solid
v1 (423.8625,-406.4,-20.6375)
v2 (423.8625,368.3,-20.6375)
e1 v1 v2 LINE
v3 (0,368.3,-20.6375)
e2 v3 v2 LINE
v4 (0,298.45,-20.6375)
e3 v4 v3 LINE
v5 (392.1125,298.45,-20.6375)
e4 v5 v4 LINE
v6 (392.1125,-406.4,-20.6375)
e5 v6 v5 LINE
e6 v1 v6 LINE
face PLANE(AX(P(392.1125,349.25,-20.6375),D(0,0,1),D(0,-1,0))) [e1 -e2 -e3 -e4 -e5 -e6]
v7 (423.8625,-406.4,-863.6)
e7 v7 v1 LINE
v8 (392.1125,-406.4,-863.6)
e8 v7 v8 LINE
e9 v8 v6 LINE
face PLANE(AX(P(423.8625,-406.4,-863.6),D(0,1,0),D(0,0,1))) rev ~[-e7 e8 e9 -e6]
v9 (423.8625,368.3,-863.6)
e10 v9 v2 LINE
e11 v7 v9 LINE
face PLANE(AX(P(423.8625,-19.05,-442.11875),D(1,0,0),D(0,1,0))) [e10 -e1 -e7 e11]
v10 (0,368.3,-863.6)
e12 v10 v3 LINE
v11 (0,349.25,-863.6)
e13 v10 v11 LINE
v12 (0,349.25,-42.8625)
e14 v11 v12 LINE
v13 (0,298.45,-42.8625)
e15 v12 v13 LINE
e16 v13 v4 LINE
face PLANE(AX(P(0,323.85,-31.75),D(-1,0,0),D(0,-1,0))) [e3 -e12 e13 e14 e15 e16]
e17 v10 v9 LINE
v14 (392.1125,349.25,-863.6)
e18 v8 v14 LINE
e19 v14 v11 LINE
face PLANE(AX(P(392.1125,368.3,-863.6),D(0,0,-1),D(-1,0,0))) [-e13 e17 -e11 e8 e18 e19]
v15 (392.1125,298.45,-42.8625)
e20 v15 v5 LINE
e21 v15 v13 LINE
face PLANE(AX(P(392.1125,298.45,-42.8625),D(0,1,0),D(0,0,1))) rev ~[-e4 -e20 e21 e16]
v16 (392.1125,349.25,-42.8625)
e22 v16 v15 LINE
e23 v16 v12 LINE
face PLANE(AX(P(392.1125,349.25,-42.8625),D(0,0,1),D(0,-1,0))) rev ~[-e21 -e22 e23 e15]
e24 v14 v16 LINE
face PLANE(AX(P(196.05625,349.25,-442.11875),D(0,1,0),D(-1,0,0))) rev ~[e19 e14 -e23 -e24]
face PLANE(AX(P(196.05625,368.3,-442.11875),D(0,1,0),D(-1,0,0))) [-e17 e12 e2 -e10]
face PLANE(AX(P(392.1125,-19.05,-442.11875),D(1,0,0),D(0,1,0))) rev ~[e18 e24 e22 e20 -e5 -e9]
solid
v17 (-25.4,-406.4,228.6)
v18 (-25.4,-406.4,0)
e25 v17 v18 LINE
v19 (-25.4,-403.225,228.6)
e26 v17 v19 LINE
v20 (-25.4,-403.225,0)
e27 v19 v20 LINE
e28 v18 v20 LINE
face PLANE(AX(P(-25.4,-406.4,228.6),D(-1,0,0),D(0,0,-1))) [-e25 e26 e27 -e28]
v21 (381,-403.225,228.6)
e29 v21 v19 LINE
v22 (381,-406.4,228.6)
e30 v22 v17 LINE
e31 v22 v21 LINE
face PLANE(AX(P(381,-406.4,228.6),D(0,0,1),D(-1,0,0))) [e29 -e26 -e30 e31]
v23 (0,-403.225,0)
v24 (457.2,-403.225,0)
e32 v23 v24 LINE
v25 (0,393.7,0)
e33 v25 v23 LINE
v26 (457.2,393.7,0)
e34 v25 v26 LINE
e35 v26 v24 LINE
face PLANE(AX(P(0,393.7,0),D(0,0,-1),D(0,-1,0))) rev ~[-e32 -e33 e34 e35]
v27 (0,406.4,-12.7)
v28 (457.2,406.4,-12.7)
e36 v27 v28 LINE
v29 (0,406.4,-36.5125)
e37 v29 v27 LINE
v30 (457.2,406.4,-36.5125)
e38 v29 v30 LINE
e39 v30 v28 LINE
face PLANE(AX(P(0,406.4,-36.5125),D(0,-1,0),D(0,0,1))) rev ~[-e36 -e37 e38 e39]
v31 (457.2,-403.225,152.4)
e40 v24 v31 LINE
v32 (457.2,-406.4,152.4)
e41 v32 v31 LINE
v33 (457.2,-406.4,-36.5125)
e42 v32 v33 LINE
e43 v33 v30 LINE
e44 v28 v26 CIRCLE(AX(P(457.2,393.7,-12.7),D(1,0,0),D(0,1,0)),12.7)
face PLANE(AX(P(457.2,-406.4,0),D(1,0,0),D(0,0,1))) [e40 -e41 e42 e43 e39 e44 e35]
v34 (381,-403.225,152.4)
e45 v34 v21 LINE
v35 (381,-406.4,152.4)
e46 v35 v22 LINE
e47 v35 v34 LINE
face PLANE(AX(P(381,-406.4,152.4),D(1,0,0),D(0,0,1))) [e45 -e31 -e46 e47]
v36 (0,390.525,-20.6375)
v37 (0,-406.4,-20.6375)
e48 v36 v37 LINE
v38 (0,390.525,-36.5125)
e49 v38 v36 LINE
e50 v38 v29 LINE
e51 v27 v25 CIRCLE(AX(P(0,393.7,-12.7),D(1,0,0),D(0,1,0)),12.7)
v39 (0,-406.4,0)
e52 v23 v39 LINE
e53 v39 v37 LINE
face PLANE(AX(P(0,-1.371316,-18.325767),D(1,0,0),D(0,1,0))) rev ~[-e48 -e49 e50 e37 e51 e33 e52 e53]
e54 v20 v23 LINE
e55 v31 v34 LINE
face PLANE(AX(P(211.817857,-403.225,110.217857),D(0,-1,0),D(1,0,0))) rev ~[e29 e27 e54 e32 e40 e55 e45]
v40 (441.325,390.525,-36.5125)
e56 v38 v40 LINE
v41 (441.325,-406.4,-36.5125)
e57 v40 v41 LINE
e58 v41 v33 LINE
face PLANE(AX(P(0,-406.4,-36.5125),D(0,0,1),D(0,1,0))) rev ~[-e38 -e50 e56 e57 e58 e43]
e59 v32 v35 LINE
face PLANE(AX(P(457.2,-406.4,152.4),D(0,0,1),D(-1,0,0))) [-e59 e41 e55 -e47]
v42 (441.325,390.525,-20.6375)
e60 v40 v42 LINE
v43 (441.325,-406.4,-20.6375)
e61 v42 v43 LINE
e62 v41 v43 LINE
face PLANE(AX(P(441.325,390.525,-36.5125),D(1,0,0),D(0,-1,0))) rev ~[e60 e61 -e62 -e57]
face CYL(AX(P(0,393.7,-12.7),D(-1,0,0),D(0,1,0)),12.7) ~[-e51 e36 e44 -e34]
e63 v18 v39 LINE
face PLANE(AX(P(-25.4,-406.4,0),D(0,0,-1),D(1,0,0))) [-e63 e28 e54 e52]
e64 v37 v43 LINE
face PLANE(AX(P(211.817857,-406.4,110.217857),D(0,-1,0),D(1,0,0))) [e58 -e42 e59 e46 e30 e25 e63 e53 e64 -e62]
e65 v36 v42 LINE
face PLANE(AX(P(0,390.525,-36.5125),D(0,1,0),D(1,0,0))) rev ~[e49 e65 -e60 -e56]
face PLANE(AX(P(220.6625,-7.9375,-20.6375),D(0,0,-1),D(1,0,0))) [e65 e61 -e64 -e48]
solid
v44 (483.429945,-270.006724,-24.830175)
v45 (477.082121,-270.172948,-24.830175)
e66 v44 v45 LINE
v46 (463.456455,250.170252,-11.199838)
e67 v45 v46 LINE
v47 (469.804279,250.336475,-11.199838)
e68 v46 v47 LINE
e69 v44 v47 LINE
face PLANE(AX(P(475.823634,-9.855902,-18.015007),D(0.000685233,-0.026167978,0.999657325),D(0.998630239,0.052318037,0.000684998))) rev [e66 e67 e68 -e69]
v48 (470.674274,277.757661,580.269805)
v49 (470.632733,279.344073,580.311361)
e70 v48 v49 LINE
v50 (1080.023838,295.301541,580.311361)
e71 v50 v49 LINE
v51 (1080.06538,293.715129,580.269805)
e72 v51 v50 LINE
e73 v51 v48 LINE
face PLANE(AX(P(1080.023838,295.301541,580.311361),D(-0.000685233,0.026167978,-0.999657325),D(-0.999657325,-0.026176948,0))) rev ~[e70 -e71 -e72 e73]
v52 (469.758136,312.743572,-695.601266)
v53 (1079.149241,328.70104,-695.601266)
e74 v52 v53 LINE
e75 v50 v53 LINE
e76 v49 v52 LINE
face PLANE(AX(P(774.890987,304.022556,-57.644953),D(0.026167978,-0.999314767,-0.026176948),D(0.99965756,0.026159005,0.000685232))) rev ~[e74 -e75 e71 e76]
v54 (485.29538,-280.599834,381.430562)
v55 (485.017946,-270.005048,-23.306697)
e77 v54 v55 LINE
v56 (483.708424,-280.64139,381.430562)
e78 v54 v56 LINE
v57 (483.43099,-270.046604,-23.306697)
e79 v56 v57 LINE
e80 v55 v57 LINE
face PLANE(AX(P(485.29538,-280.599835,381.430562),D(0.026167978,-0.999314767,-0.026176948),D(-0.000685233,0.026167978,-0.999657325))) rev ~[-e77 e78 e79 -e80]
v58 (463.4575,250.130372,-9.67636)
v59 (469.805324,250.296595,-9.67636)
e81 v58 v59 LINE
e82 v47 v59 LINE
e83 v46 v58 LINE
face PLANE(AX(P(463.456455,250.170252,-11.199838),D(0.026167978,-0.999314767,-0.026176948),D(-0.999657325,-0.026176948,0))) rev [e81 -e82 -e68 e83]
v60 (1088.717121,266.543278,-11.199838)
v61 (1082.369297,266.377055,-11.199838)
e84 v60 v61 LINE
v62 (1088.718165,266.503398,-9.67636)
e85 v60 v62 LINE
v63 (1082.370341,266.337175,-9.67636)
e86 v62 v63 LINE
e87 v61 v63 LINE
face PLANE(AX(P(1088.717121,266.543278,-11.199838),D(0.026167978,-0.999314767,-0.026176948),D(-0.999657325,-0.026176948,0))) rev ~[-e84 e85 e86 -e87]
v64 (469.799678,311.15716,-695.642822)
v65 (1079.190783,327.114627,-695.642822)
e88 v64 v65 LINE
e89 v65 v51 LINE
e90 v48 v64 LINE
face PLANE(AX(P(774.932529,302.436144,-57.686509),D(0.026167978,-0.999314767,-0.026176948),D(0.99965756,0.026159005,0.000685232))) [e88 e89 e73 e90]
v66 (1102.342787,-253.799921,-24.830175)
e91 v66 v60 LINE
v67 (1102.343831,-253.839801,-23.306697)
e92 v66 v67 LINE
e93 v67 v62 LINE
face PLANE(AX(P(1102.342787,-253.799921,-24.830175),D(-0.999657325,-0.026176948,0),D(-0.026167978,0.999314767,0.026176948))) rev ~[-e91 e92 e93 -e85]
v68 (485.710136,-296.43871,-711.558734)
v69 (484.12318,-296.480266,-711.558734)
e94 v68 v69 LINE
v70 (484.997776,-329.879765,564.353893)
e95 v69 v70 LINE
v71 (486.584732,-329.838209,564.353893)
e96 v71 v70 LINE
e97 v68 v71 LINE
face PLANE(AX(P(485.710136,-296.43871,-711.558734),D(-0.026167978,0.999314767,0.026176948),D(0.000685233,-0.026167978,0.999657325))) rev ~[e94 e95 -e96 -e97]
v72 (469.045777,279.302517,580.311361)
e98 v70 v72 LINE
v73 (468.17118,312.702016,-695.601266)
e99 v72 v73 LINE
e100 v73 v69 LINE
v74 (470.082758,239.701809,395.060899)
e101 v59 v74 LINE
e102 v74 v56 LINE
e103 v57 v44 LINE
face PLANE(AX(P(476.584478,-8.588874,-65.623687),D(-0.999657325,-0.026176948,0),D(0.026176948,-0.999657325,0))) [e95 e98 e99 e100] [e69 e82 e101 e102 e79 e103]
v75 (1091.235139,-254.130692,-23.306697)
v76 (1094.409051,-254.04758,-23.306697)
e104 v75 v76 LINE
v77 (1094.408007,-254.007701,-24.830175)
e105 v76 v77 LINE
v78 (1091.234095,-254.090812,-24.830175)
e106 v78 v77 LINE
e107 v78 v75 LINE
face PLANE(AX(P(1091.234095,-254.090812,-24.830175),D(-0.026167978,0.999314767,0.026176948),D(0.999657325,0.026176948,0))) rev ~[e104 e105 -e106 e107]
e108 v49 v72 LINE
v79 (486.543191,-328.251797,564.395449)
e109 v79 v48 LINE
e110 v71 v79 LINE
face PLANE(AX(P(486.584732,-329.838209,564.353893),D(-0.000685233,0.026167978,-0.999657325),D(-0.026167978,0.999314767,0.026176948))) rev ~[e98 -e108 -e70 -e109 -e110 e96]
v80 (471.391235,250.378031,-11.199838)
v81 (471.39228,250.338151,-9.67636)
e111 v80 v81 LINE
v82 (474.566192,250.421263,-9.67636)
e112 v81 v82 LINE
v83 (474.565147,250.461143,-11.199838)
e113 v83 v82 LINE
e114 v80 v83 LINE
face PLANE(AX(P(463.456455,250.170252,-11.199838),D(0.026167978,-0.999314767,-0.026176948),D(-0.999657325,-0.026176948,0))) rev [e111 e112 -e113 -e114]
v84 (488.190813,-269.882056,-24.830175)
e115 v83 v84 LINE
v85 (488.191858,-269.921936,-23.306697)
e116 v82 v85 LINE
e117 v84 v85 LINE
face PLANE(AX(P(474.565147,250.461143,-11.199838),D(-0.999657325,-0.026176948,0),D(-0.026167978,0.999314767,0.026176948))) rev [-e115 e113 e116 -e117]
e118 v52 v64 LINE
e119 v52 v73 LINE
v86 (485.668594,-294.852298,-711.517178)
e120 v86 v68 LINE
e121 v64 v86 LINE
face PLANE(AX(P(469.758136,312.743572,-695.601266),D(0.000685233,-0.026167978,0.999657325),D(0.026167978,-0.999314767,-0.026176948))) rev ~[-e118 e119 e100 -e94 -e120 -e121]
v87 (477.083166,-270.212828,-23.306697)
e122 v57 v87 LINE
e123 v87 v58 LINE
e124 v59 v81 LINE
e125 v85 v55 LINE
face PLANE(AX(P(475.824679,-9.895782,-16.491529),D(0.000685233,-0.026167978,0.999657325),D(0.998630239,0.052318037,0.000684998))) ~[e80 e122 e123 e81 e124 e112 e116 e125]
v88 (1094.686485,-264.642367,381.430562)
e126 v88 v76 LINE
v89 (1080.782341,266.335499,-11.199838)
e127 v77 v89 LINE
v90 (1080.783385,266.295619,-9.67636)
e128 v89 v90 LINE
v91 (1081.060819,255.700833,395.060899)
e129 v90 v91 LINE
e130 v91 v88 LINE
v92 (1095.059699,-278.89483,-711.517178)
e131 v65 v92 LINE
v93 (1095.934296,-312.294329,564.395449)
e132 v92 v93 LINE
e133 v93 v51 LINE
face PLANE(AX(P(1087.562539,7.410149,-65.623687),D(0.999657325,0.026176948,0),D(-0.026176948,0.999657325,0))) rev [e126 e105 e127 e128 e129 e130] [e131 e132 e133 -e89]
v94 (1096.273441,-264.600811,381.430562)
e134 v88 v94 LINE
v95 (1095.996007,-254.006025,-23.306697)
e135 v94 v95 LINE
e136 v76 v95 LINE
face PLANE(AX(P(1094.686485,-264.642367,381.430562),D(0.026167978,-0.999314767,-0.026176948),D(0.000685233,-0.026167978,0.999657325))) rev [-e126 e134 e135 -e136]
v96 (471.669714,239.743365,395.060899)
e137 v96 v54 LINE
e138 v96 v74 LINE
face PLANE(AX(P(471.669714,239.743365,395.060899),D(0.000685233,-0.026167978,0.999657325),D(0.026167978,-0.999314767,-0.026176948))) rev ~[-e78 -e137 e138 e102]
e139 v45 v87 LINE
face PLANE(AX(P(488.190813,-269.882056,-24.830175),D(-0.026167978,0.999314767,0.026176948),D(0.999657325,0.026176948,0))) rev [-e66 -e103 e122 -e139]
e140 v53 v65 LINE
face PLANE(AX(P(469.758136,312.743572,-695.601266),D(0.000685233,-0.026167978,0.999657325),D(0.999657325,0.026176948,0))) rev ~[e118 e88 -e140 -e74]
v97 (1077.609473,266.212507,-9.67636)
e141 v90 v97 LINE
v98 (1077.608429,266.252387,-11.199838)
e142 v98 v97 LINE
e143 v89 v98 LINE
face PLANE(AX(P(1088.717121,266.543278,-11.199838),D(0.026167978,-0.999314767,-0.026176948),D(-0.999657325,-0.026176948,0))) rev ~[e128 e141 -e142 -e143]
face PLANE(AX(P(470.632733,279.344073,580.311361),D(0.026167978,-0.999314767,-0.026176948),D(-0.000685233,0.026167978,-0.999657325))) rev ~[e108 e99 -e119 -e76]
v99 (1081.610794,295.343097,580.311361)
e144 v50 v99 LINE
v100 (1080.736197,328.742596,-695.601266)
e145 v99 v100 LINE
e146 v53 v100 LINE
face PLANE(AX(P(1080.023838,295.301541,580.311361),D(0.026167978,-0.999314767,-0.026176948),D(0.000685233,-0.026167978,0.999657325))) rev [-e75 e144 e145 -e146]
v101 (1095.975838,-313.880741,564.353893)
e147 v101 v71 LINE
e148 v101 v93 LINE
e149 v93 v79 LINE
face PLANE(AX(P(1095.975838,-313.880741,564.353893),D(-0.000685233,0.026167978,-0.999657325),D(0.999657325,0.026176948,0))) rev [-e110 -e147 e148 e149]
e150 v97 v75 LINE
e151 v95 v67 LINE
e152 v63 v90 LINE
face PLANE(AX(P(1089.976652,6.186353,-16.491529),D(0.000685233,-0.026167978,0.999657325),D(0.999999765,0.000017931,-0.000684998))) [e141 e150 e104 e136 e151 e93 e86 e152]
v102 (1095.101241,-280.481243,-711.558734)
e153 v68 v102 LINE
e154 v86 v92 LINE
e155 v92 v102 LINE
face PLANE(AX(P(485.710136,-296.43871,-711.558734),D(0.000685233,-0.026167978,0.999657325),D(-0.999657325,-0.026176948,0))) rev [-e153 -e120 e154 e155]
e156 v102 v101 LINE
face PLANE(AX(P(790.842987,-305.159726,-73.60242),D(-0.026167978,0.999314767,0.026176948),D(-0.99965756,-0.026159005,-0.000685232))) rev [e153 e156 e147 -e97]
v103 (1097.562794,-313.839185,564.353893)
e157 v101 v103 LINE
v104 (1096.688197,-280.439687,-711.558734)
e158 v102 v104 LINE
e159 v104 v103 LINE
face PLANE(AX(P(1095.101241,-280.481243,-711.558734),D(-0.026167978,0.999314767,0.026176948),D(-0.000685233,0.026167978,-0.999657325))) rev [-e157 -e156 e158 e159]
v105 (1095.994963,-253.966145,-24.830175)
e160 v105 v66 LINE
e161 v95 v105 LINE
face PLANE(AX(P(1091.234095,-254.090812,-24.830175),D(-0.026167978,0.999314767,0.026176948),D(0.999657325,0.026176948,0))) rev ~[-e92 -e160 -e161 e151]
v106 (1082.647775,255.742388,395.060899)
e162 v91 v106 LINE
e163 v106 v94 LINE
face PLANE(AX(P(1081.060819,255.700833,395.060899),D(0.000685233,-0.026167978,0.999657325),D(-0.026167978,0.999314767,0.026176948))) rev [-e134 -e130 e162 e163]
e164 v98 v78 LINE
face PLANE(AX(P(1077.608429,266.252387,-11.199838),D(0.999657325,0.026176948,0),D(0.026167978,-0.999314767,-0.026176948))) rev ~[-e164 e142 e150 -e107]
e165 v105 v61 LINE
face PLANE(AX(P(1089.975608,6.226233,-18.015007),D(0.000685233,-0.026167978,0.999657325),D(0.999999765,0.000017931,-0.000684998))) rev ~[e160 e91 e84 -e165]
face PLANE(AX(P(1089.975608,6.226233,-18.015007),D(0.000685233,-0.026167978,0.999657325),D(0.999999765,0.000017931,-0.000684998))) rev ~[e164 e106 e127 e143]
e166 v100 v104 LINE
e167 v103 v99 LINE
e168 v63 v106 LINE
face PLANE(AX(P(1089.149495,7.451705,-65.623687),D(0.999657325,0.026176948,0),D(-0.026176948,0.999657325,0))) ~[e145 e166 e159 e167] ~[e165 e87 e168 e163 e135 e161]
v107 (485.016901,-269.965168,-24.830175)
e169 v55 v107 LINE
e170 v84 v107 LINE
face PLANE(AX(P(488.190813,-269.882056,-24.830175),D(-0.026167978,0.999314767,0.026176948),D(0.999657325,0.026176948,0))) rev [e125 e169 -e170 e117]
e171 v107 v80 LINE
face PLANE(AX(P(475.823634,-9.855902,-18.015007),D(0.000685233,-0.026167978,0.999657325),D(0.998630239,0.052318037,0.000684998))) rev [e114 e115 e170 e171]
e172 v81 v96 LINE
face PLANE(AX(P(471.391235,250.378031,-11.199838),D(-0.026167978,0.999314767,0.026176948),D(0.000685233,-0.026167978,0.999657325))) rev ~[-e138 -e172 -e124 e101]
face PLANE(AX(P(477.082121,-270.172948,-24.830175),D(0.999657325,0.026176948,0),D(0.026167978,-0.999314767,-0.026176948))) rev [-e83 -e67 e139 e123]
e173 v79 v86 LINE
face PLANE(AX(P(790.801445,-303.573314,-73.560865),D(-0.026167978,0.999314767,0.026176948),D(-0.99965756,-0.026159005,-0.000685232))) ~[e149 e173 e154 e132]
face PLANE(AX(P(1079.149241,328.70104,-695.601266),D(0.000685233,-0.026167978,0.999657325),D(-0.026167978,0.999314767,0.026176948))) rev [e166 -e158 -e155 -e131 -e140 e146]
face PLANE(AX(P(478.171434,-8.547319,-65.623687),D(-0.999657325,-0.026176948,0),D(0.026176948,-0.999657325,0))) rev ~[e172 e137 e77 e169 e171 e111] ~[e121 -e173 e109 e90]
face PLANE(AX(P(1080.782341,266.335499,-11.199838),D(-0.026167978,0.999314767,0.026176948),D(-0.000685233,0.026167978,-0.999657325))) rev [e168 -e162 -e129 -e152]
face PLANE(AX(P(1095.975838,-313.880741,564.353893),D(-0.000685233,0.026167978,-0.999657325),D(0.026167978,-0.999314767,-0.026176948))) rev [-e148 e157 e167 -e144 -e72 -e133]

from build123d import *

# Parameters (mm, degrees)
F2_DEPTH  = 457.2
F3_W      = 441.325
F3_H      = 796.925
F4_DEPTH  = 15.875
F11_DEPTH = 3.175
F13_W     = 774.7
F13_H     = 842.9625
F14_DEPTH = 31.75
F17_DEPTH = 1.5875
F21_DEPTH = 1.5875
F23_W     = 392.1125
F23_H     = 842.9625
F24_DEPTH = 19.05
F25_W     = 50.8
F25_H     = 22.225
F26_DEPTH = 392.1125
F28_DEPTH = 1.524


with BuildPart() as f2:
    # F1 (on Right) → F2 (new body)
    with BuildSketch(Plane.YZ):
        with BuildLine():
            Line((393.7, 0), (-406.4, 0))
            Line((-406.4, 0), (-406.4, -36.5125))
            Line((-406.4, -36.5125), (406.4, -36.5125))
            Line((406.4, -36.5125), (406.4, -12.7))
            ThreePointArc((406.4, -12.7), (402.6802561211, -3.7197438789), (393.7, 0))
        make_face()
    extrude(amount=F2_DEPTH)

    # F3 (on face) → F4 (cut)
    with BuildSketch(Plane(origin=(0, 0, -36.5125), x_dir=(1, 0, 0), z_dir=(0, 0, -1))):
        with Locations((220.6625, 7.9375)):
            Rectangle(F3_W, F3_H)
    extrude(amount=-F4_DEPTH, mode=Mode.SUBTRACT)

    # F10 (on offset) → F11 (join)
    with BuildSketch(Plane.XZ.offset(406.4)):
        Polygon((274.5299355409, 0), (457.2, 0), (457.2, 152.4), (381, 152.4), (381, 228.6), (-25.4, 228.6), (-25.4, 0), align=None)
    extrude(amount=-F11_DEPTH)


with BuildPart() as f14:
    # F13 (on offset) → F14 (new body)
    with BuildSketch(Plane.YZ.offset(423.8625)):
        with Locations((-19.05, -442.11875)):
            Rectangle(F13_W, F13_H)
    extrude(amount=-F14_DEPTH)

    # F23 (on face) → F24 (join)
    with BuildSketch(Plane(origin=(0, 368.3, 0), x_dir=(-1, 0, 0), z_dir=(0, 1, 0))):
        with Locations((-196.05625, -442.11875)):
            Rectangle(F23_W, F23_H)
    extrude(amount=-F24_DEPTH)

    # F25 (on face) → F26 (join, through all)
    with BuildSketch(Plane(origin=(392.1125, 0, 0), x_dir=(0, -1, 0), z_dir=(-1, 0, 0))):
        with Locations((-323.85, -31.75)):
            Rectangle(F25_W, F25_H)
    extrude(amount=F26_DEPTH)


with BuildPart() as f17:
    # F16 (on offset) → F17 (new body)
    with BuildSketch(Plane(origin=(477.6201094775, 12.5069227266, 0), x_dir=(0.0261769483, -0.999657325, 0), z_dir=(-0.999657325, -0.0261769483, 0))):
        Polygon((-266.9286201536, 580.3113605768), (-300.3395681263, -695.6012661558), (309.0515371788, -711.5587338442), (342.4624851515, 564.3538928883), align=None)
        Polygon((282.5689202331, -24.8301750237), (-237.9526488816, -11.1998380398), (-227.3143370893, 395.0608988303), (293.2072320255, 381.4305618463), align=None, mode=Mode.SUBTRACT)
    extrude(amount=F17_DEPTH)


with BuildPart() as f18_1:
    # F18: instance of F17
    add(f17.part.mirror(Plane(origin=(782.32, 20.32, -101.6), x_dir=(0.0261769483, -0.999657325, 0), z_dir=(-0.999657325, -0.0261769483, 0))))


with BuildPart() as f17_1:
    add(f17.part)

    add(f18_1.part)  # F21 merges F18_1
    # F20 (on plane+point) → F21 (join)
    with BuildSketch(Plane(origin=(-7.3801007247, 281.8346761317, 7.3826305678), x_dir=(0.9996575598, 0.0261590049, 0.0006852325), z_dir=(0.0261679781, -0.9993147674, -0.0261769483))):
        Polygon((1086.9015409083, -703.9700752338), (1087.776437166, 572.3796249098), (478.176580381, 572.7974858089), (477.3016841234, -703.5522143346), align=None)
    extrude(amount=F21_DEPTH)


with BuildPart() as f22_1:
    # F22: instance of F17
    add(f17_1.part.mirror(Plane(origin=(782.8423262467, 0.3731653894, -101.6), x_dir=(0.0006852326, -0.0261679781, 0.999657325), z_dir=(0.0261679781, -0.9993147674, -0.0261769483))))


with BuildPart() as f17_2:
    add(f17_1.part)

    add(f22_1.part)  # F28 merges F22_1
    # F27 (on face) → F28 (join)
    with BuildSketch(Plane(origin=(-0.0119400923, 0.4559737301, -17.4189032553), x_dir=(0.9999997652, 1.79312e-05, -0.000684998), z_dir=(0.0006852326, -0.0261679781, 0.999657325))):
        Polygon((1091.2462910804, -254.6535570042), (1102.3549857122, -254.3627652791), (1088.7293163055, 266.1589260396), (1077.6206216737, 265.8681343144), align=None)
    extrude(amount=F28_DEPTH)

    # F29: F17 across plane


with BuildPart() as f17_3:
    add(f17_2.part)
    add(f17_2.part.mirror(Plane(origin=(782.32, 20.32, -101.6), x_dir=(0.0261769483, -0.999657325, 0), z_dir=(-0.999657325, -0.0261769483, 0))))


solid = Compound([f2.part, f14.part, f17_3.part])
